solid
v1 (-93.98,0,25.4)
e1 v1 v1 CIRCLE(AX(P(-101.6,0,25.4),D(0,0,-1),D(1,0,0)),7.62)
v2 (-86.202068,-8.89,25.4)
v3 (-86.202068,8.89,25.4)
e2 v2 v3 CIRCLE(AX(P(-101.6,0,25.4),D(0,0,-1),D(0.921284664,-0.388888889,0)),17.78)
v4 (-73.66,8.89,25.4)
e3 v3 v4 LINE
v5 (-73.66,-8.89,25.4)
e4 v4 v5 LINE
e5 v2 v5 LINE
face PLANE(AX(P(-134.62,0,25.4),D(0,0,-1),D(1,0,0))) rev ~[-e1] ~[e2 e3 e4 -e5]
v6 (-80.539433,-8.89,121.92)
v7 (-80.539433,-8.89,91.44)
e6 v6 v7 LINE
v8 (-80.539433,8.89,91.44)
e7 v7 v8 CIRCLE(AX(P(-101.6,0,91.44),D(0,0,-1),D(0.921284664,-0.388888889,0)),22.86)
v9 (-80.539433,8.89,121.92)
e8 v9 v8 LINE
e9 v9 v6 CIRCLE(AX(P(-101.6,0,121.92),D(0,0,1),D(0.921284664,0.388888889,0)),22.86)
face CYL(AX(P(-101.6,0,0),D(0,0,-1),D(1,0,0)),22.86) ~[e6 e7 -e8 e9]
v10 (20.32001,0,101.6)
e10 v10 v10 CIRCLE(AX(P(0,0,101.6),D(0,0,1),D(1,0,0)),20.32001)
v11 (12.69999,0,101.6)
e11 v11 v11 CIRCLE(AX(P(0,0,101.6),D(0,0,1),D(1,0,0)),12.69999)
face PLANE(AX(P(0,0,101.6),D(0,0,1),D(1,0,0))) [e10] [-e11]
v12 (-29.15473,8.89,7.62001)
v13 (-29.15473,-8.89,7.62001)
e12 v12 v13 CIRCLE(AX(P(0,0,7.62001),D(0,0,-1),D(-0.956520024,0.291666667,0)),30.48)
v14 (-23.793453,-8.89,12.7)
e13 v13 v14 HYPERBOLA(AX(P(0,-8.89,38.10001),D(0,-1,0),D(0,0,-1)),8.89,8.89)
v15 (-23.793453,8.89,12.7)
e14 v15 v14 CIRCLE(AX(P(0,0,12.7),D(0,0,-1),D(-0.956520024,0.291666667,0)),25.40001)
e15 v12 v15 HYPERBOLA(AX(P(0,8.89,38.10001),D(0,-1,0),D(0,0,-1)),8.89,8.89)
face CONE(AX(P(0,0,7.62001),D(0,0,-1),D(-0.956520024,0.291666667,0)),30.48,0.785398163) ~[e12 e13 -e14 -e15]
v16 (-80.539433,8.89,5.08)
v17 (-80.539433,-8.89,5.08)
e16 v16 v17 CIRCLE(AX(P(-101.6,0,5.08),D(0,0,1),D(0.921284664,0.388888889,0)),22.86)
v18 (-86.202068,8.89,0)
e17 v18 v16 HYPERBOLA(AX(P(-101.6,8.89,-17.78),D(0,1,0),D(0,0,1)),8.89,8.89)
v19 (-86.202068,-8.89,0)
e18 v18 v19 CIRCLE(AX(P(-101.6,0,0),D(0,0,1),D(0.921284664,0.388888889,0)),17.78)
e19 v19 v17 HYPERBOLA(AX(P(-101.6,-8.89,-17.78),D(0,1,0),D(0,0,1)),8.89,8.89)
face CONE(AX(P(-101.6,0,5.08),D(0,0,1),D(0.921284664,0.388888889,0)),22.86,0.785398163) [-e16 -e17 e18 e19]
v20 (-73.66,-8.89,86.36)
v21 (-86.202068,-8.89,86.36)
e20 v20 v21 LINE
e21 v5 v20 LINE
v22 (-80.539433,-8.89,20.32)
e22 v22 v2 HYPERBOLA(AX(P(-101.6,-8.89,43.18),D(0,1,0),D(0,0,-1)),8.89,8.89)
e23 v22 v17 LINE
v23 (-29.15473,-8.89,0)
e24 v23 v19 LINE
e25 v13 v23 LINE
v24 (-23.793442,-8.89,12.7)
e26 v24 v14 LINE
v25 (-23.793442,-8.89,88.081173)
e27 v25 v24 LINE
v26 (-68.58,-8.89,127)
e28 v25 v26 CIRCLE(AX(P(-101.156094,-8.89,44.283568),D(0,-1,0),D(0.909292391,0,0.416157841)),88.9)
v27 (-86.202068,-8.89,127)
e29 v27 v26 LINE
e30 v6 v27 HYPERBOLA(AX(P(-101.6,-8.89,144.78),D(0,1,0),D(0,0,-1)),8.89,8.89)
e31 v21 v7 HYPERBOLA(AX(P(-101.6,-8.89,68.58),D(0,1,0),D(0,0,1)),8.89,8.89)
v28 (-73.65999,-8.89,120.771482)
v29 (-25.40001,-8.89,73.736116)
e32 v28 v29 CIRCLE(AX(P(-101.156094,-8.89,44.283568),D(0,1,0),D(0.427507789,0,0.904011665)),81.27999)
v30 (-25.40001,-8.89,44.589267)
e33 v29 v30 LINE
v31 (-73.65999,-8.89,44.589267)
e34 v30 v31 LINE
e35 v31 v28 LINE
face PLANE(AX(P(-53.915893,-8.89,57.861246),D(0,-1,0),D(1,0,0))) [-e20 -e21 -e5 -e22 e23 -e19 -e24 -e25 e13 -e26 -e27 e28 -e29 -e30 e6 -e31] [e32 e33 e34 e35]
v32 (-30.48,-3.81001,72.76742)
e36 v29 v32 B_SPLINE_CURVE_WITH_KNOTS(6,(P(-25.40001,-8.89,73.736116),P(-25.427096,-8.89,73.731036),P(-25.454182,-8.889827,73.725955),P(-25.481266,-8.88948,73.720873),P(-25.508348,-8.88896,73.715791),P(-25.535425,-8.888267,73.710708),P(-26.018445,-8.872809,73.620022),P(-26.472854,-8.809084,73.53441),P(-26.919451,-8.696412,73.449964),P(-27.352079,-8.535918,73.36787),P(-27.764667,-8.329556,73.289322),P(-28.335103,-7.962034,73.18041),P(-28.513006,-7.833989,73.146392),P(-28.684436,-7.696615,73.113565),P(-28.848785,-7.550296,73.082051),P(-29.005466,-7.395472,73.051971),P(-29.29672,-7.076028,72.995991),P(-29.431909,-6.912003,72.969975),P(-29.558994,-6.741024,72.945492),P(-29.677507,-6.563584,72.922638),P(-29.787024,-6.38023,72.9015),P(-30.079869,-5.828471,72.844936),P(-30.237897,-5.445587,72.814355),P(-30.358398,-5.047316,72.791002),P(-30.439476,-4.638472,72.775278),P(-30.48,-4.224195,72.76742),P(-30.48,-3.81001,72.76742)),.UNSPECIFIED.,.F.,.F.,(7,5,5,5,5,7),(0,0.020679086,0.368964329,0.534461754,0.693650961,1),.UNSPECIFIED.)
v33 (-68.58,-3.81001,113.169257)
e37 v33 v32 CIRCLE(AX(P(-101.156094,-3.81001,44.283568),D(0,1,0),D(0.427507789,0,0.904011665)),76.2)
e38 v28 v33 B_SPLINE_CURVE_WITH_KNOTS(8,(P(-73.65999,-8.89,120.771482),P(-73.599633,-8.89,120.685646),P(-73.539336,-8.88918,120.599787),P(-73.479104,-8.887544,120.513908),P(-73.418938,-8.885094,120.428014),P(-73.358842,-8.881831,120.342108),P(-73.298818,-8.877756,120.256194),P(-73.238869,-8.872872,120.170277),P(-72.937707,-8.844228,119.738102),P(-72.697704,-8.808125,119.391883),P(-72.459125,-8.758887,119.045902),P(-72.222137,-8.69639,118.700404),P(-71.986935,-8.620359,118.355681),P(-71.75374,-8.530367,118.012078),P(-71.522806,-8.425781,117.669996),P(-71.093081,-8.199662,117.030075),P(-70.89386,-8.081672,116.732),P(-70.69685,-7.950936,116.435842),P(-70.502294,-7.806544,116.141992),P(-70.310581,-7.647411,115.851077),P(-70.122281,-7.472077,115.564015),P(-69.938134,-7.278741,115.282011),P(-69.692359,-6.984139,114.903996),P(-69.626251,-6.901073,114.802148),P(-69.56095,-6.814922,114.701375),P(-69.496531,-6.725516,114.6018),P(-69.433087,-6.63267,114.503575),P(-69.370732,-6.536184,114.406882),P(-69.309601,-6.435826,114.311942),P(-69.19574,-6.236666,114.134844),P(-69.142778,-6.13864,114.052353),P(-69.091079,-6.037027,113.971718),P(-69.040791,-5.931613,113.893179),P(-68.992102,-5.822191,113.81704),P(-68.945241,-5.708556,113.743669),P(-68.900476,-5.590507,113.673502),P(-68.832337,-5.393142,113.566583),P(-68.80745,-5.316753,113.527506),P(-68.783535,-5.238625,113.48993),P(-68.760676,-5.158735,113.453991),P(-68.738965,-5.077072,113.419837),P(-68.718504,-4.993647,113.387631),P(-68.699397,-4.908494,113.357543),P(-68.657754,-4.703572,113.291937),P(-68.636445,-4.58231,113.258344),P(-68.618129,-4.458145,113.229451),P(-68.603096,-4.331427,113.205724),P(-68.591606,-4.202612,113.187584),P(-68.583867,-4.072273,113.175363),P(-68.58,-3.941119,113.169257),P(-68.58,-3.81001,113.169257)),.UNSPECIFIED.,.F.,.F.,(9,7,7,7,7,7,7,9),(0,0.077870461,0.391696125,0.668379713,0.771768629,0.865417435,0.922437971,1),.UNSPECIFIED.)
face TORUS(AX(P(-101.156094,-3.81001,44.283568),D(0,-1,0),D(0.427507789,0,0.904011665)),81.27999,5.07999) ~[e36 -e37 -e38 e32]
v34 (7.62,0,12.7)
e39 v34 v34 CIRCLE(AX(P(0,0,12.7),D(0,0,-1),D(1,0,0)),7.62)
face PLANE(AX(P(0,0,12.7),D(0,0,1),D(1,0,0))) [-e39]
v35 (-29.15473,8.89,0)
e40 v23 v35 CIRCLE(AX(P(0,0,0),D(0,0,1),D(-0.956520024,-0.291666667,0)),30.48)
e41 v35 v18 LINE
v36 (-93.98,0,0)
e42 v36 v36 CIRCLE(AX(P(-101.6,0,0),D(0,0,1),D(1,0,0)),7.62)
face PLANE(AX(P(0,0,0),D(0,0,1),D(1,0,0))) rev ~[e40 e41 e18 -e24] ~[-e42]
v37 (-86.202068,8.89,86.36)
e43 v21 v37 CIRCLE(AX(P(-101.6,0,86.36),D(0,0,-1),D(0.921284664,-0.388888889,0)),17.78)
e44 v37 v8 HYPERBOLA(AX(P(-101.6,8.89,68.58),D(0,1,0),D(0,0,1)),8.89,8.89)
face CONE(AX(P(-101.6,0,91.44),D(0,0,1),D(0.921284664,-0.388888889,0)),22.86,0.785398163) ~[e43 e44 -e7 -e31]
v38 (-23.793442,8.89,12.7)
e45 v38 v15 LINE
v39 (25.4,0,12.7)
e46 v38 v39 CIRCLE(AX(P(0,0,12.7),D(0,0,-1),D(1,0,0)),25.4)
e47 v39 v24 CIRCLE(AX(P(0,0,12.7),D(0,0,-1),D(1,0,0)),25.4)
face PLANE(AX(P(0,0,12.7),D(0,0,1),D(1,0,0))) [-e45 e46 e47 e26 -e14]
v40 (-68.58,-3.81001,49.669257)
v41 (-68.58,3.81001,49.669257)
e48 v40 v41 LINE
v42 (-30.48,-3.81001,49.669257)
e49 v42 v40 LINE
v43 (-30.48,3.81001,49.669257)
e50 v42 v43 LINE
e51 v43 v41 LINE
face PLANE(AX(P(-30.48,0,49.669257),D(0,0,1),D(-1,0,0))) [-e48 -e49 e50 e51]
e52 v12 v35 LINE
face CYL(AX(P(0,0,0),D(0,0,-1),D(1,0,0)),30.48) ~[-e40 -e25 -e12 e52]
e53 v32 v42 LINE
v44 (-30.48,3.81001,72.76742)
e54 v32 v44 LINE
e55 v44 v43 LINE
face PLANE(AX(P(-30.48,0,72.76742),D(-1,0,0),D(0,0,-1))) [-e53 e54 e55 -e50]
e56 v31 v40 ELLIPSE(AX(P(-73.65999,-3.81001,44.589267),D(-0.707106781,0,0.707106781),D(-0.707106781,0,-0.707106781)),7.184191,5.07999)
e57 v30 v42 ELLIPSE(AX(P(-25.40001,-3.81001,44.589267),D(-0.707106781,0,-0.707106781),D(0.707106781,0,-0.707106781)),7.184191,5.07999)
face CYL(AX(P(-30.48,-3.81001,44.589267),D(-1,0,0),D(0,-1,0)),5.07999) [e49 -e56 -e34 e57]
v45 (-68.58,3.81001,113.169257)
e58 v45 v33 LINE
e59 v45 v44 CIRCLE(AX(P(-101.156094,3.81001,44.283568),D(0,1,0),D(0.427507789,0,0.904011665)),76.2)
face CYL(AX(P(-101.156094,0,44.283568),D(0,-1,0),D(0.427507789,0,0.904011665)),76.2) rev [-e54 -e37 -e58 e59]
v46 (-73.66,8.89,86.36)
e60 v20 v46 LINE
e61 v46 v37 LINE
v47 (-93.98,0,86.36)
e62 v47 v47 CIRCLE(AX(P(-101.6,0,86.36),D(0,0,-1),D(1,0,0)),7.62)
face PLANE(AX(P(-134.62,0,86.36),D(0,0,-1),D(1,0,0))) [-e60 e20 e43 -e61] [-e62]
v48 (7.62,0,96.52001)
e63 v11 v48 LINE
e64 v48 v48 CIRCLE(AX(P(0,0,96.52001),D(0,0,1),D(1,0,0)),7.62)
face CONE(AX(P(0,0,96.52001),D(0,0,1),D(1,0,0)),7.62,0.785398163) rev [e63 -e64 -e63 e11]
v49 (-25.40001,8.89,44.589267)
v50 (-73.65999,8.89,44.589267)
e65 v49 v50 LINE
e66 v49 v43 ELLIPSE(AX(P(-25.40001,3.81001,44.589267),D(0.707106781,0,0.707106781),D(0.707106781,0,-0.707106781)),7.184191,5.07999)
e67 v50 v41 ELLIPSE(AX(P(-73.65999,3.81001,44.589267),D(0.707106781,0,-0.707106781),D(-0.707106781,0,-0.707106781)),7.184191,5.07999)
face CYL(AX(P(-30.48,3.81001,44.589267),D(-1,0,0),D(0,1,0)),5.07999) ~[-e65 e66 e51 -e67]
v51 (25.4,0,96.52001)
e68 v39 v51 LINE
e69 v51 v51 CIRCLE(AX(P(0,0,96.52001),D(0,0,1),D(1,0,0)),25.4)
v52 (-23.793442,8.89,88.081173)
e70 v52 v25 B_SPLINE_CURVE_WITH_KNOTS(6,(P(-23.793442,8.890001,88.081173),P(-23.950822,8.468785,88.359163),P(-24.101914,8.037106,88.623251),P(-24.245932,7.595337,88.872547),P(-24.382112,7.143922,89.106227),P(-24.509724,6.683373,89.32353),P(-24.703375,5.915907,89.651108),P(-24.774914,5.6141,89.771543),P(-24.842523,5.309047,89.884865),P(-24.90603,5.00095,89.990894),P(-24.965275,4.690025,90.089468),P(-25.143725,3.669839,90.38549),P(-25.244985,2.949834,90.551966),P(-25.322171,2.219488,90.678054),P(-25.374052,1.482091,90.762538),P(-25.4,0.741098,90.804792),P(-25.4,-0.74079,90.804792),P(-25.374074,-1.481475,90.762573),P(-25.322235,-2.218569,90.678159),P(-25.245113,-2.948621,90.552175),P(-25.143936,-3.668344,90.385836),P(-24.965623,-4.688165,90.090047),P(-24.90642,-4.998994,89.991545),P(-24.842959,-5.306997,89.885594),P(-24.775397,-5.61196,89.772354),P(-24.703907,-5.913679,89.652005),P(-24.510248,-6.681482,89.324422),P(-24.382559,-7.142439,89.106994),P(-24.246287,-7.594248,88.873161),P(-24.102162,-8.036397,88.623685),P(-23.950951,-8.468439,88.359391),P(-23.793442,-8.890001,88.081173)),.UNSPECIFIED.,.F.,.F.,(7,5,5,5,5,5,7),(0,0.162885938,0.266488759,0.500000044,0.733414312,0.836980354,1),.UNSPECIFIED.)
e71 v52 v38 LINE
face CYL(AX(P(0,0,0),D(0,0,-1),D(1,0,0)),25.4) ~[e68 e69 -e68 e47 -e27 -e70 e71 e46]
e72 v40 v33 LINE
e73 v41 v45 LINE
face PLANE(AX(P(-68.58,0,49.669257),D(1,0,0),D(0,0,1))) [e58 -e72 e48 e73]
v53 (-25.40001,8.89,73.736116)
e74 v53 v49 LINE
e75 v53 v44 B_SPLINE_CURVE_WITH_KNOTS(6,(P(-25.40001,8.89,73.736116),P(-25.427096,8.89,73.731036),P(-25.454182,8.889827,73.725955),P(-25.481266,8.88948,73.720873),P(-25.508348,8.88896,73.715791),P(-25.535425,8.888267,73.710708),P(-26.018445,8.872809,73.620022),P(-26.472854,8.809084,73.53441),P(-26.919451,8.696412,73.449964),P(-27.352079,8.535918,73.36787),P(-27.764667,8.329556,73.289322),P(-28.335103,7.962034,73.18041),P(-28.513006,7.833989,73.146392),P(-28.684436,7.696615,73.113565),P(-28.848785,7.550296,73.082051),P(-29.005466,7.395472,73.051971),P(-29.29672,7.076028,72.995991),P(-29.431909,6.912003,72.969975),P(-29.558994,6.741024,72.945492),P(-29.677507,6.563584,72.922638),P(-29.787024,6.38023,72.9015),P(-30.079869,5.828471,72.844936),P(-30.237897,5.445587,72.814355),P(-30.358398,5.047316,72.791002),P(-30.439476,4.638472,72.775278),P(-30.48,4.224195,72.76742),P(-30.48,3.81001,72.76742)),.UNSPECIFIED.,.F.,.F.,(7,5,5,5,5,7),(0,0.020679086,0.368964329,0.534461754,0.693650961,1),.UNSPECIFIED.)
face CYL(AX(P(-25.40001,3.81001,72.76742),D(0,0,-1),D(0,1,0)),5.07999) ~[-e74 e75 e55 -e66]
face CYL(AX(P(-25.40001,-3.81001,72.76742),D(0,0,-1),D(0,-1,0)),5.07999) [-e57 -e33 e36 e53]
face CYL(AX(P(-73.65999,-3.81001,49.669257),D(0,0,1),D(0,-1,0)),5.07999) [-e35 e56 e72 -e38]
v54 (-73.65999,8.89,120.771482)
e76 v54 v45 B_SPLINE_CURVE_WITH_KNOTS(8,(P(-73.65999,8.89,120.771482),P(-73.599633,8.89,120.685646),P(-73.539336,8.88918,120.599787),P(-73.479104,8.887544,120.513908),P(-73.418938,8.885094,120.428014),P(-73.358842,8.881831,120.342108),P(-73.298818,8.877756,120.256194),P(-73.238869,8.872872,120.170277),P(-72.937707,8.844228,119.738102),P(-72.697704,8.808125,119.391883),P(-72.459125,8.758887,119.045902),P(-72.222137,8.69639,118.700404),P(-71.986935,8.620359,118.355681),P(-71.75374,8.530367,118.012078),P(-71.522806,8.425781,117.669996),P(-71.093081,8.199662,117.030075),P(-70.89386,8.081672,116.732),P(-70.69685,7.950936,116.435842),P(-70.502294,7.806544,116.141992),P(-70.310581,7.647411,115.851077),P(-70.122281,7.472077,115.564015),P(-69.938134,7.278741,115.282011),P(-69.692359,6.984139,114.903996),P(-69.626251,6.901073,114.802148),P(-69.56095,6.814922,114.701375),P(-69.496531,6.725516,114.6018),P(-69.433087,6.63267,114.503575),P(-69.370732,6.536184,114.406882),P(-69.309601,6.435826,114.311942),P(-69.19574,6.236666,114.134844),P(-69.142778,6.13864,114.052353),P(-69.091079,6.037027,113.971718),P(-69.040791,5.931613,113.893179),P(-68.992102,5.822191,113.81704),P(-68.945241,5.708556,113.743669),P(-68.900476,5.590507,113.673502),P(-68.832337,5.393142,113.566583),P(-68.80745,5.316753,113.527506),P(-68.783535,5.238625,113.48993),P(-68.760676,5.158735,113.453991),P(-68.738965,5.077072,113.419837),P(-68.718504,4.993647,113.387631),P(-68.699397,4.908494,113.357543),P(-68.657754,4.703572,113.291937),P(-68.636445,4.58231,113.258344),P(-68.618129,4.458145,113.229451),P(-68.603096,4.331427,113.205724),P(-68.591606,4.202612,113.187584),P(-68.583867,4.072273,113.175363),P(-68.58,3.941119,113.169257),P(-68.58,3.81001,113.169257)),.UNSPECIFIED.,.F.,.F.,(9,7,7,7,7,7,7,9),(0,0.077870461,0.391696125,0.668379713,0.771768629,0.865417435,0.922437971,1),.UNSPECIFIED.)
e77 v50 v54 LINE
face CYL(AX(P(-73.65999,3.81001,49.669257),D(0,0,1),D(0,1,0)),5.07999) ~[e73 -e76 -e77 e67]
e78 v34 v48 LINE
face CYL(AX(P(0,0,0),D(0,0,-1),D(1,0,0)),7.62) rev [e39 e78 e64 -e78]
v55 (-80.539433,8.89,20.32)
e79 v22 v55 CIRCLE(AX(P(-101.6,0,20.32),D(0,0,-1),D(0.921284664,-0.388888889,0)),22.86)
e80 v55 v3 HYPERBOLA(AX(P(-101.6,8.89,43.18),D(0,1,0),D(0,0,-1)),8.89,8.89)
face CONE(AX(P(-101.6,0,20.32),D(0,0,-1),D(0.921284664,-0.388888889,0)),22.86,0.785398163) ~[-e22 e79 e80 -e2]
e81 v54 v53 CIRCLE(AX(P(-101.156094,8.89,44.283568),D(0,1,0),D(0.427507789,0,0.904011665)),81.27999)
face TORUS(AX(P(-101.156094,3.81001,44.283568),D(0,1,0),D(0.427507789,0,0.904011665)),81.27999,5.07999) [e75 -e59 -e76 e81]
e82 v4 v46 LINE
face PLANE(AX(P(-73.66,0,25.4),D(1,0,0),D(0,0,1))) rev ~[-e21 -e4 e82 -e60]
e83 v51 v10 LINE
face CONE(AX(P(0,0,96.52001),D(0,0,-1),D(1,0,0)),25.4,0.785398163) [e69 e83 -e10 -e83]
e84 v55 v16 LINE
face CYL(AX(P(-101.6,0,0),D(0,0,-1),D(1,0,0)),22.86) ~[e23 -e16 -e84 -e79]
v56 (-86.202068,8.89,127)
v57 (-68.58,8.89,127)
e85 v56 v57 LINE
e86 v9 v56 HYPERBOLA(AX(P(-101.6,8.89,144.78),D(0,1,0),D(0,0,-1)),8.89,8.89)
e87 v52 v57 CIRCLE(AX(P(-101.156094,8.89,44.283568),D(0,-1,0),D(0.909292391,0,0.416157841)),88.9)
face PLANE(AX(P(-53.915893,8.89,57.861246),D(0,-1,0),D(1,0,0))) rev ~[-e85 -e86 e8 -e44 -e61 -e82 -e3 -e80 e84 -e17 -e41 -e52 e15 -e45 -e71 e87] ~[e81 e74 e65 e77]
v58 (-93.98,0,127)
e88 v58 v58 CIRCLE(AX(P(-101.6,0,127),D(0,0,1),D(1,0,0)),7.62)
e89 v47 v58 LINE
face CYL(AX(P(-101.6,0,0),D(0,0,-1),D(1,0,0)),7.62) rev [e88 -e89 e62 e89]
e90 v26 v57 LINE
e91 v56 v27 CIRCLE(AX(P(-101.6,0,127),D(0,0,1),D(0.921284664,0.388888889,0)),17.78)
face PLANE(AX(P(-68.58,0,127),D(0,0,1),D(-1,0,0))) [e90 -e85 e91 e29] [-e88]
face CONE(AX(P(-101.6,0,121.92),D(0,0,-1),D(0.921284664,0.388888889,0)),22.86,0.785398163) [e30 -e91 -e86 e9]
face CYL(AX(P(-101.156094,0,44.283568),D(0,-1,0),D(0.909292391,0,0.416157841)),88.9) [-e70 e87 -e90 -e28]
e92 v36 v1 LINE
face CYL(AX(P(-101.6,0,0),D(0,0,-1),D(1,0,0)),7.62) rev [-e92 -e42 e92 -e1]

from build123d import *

# Parameters (mm, degrees)
F0_R      = 22.86
F0_R_2    = 7.62
F1_DEPTH  = 127
F0_R_3    = 25.4
F2_DEPTH  = 101.6
F4_DEPTH  = 8.89
F5_W      = 60.96
F5_H      = 60.96
F6_DEPTH  = 50.8
F7_R      = 5.07999
F8_SIZE   = 5.08
F9_R      = 30.48
F10_DEPTH = 12.7
F11_SIZE  = 5.07999


# Not quite as in the source:
# - a fillet or chamfer is up to 0.001 mm smaller than in the source, because OpenCascade refuses the exact size


with BuildPart() as f1:
    # F0 (on Top) → F1 (new body)
    with BuildSketch(Plane.XY):
        with Locations((-101.6, 0)):
            Circle(F0_R)
        with Locations((-101.6, 0)):
            Circle(F0_R_2, mode=Mode.SUBTRACT)
    extrude(amount=F1_DEPTH)



with BuildPart() as f2:
    # F0 (on Top) → F2 (new body)
    with BuildSketch(Plane.XY):
        Circle(F0_R_3)
        Circle(F0_R_2, mode=Mode.SUBTRACT)
    extrude(amount=F2_DEPTH)


with BuildPart() as f1_1:
    add(f1.part)

    add(f2.part)  # F4 merges F2
    # F3 (on Front) → F4 (join, symmetric)
    with BuildSketch(Plane.XZ):
        with BuildLine():
            Line((-81.28, 127), (-81.28, 0))
            Line((-81.28, 0), (-20.32, 0))
            Line((-20.32, 0), (-20.32, 81.28))
            ThreePointArc((-20.32, 81.28), (-40.0155943211, 108.82076155), (-68.58, 127))
            Line((-68.58, 127), (-81.28, 127))
        make_face()
        with BuildLine():
            ThreePointArc((-68.58, 113.1692568198), (-45.7184650999, 96.5627163287), (-30.48, 72.7674195988))
            Line((-30.48, 72.7674195988), (-30.48, 49.6692568198))
            Line((-30.48, 49.6692568198), (-68.58, 49.6692568198))
            Line((-68.58, 49.6692568198), (-68.58, 113.1692568198))
        make_face(mode=Mode.SUBTRACT)
    extrude(amount=F4_DEPTH, both=True)

    # F5 (on Front) → F6 (cut, symmetric)
    with BuildSketch(Plane.XZ):
        with Locations((-104.14, 55.88)):
            Rectangle(F5_W, F5_H)
    extrude(amount=F6_DEPTH, both=True, mode=Mode.SUBTRACT)

    # F7 (radius 5.08 in the source; OpenCascade refuses exactly that, so slightly less here)
    f7_edges = [f1_1.edges().sort_by_distance(p)[0] for p in [
        (-45.718465, -8.89, 96.562716),
        (-30.48, -8.89, 61.218338),
        (-49.53, -8.89, 49.669257),
        (-68.58, -8.89, 81.419257),
        (-45.718465, 8.89, 96.562716),
        (-30.48, 8.89, 61.218338),
        (-49.53, 8.89, 49.669257),
        (-68.58, 8.89, 81.419257),
    ]]
    fillet(f7_edges, radius=F7_R)

    # F8
    f8_edges = [f1_1.edges().sort_by_distance(p)[0] for p in [
        (-124.46, 0, 86.36),
        (-124.46, 0, 0),
        (-124.46, 0, 25.4),
        (-124.46, 0, 127),
    ]]
    chamfer(f8_edges, length=F8_SIZE)

    # F9 (on Top) → F10 (join)
    with BuildSketch(Plane.XY):
        Circle(F9_R)
        with BuildLine():
            Line((-62.23, 2.54), (-62.23, -2.54))
            Line((-62.23, -2.54), (-31.6482369177, -2.54))
            ThreePointArc((-31.6482369177, -2.54), (-31.75, 0), (-31.6482369177, 2.54))
            Line((-31.6482369177, 2.54), (-62.23, 2.54))
        make_face()
    extrude(amount=F10_DEPTH)

    # F11 (size 5.08 in the source; OpenCascade refuses exactly that, so slightly less here)
    f11_edges = [f1_1.edges().sort_by_distance(p)[0] for p in [
        (30.48, 0, 12.7),
        (-25.4, 0, 101.6),
        (-7.62, 0, 101.6),
    ]]
    chamfer(f11_edges, length=F11_SIZE)


solid = f1_1.part
